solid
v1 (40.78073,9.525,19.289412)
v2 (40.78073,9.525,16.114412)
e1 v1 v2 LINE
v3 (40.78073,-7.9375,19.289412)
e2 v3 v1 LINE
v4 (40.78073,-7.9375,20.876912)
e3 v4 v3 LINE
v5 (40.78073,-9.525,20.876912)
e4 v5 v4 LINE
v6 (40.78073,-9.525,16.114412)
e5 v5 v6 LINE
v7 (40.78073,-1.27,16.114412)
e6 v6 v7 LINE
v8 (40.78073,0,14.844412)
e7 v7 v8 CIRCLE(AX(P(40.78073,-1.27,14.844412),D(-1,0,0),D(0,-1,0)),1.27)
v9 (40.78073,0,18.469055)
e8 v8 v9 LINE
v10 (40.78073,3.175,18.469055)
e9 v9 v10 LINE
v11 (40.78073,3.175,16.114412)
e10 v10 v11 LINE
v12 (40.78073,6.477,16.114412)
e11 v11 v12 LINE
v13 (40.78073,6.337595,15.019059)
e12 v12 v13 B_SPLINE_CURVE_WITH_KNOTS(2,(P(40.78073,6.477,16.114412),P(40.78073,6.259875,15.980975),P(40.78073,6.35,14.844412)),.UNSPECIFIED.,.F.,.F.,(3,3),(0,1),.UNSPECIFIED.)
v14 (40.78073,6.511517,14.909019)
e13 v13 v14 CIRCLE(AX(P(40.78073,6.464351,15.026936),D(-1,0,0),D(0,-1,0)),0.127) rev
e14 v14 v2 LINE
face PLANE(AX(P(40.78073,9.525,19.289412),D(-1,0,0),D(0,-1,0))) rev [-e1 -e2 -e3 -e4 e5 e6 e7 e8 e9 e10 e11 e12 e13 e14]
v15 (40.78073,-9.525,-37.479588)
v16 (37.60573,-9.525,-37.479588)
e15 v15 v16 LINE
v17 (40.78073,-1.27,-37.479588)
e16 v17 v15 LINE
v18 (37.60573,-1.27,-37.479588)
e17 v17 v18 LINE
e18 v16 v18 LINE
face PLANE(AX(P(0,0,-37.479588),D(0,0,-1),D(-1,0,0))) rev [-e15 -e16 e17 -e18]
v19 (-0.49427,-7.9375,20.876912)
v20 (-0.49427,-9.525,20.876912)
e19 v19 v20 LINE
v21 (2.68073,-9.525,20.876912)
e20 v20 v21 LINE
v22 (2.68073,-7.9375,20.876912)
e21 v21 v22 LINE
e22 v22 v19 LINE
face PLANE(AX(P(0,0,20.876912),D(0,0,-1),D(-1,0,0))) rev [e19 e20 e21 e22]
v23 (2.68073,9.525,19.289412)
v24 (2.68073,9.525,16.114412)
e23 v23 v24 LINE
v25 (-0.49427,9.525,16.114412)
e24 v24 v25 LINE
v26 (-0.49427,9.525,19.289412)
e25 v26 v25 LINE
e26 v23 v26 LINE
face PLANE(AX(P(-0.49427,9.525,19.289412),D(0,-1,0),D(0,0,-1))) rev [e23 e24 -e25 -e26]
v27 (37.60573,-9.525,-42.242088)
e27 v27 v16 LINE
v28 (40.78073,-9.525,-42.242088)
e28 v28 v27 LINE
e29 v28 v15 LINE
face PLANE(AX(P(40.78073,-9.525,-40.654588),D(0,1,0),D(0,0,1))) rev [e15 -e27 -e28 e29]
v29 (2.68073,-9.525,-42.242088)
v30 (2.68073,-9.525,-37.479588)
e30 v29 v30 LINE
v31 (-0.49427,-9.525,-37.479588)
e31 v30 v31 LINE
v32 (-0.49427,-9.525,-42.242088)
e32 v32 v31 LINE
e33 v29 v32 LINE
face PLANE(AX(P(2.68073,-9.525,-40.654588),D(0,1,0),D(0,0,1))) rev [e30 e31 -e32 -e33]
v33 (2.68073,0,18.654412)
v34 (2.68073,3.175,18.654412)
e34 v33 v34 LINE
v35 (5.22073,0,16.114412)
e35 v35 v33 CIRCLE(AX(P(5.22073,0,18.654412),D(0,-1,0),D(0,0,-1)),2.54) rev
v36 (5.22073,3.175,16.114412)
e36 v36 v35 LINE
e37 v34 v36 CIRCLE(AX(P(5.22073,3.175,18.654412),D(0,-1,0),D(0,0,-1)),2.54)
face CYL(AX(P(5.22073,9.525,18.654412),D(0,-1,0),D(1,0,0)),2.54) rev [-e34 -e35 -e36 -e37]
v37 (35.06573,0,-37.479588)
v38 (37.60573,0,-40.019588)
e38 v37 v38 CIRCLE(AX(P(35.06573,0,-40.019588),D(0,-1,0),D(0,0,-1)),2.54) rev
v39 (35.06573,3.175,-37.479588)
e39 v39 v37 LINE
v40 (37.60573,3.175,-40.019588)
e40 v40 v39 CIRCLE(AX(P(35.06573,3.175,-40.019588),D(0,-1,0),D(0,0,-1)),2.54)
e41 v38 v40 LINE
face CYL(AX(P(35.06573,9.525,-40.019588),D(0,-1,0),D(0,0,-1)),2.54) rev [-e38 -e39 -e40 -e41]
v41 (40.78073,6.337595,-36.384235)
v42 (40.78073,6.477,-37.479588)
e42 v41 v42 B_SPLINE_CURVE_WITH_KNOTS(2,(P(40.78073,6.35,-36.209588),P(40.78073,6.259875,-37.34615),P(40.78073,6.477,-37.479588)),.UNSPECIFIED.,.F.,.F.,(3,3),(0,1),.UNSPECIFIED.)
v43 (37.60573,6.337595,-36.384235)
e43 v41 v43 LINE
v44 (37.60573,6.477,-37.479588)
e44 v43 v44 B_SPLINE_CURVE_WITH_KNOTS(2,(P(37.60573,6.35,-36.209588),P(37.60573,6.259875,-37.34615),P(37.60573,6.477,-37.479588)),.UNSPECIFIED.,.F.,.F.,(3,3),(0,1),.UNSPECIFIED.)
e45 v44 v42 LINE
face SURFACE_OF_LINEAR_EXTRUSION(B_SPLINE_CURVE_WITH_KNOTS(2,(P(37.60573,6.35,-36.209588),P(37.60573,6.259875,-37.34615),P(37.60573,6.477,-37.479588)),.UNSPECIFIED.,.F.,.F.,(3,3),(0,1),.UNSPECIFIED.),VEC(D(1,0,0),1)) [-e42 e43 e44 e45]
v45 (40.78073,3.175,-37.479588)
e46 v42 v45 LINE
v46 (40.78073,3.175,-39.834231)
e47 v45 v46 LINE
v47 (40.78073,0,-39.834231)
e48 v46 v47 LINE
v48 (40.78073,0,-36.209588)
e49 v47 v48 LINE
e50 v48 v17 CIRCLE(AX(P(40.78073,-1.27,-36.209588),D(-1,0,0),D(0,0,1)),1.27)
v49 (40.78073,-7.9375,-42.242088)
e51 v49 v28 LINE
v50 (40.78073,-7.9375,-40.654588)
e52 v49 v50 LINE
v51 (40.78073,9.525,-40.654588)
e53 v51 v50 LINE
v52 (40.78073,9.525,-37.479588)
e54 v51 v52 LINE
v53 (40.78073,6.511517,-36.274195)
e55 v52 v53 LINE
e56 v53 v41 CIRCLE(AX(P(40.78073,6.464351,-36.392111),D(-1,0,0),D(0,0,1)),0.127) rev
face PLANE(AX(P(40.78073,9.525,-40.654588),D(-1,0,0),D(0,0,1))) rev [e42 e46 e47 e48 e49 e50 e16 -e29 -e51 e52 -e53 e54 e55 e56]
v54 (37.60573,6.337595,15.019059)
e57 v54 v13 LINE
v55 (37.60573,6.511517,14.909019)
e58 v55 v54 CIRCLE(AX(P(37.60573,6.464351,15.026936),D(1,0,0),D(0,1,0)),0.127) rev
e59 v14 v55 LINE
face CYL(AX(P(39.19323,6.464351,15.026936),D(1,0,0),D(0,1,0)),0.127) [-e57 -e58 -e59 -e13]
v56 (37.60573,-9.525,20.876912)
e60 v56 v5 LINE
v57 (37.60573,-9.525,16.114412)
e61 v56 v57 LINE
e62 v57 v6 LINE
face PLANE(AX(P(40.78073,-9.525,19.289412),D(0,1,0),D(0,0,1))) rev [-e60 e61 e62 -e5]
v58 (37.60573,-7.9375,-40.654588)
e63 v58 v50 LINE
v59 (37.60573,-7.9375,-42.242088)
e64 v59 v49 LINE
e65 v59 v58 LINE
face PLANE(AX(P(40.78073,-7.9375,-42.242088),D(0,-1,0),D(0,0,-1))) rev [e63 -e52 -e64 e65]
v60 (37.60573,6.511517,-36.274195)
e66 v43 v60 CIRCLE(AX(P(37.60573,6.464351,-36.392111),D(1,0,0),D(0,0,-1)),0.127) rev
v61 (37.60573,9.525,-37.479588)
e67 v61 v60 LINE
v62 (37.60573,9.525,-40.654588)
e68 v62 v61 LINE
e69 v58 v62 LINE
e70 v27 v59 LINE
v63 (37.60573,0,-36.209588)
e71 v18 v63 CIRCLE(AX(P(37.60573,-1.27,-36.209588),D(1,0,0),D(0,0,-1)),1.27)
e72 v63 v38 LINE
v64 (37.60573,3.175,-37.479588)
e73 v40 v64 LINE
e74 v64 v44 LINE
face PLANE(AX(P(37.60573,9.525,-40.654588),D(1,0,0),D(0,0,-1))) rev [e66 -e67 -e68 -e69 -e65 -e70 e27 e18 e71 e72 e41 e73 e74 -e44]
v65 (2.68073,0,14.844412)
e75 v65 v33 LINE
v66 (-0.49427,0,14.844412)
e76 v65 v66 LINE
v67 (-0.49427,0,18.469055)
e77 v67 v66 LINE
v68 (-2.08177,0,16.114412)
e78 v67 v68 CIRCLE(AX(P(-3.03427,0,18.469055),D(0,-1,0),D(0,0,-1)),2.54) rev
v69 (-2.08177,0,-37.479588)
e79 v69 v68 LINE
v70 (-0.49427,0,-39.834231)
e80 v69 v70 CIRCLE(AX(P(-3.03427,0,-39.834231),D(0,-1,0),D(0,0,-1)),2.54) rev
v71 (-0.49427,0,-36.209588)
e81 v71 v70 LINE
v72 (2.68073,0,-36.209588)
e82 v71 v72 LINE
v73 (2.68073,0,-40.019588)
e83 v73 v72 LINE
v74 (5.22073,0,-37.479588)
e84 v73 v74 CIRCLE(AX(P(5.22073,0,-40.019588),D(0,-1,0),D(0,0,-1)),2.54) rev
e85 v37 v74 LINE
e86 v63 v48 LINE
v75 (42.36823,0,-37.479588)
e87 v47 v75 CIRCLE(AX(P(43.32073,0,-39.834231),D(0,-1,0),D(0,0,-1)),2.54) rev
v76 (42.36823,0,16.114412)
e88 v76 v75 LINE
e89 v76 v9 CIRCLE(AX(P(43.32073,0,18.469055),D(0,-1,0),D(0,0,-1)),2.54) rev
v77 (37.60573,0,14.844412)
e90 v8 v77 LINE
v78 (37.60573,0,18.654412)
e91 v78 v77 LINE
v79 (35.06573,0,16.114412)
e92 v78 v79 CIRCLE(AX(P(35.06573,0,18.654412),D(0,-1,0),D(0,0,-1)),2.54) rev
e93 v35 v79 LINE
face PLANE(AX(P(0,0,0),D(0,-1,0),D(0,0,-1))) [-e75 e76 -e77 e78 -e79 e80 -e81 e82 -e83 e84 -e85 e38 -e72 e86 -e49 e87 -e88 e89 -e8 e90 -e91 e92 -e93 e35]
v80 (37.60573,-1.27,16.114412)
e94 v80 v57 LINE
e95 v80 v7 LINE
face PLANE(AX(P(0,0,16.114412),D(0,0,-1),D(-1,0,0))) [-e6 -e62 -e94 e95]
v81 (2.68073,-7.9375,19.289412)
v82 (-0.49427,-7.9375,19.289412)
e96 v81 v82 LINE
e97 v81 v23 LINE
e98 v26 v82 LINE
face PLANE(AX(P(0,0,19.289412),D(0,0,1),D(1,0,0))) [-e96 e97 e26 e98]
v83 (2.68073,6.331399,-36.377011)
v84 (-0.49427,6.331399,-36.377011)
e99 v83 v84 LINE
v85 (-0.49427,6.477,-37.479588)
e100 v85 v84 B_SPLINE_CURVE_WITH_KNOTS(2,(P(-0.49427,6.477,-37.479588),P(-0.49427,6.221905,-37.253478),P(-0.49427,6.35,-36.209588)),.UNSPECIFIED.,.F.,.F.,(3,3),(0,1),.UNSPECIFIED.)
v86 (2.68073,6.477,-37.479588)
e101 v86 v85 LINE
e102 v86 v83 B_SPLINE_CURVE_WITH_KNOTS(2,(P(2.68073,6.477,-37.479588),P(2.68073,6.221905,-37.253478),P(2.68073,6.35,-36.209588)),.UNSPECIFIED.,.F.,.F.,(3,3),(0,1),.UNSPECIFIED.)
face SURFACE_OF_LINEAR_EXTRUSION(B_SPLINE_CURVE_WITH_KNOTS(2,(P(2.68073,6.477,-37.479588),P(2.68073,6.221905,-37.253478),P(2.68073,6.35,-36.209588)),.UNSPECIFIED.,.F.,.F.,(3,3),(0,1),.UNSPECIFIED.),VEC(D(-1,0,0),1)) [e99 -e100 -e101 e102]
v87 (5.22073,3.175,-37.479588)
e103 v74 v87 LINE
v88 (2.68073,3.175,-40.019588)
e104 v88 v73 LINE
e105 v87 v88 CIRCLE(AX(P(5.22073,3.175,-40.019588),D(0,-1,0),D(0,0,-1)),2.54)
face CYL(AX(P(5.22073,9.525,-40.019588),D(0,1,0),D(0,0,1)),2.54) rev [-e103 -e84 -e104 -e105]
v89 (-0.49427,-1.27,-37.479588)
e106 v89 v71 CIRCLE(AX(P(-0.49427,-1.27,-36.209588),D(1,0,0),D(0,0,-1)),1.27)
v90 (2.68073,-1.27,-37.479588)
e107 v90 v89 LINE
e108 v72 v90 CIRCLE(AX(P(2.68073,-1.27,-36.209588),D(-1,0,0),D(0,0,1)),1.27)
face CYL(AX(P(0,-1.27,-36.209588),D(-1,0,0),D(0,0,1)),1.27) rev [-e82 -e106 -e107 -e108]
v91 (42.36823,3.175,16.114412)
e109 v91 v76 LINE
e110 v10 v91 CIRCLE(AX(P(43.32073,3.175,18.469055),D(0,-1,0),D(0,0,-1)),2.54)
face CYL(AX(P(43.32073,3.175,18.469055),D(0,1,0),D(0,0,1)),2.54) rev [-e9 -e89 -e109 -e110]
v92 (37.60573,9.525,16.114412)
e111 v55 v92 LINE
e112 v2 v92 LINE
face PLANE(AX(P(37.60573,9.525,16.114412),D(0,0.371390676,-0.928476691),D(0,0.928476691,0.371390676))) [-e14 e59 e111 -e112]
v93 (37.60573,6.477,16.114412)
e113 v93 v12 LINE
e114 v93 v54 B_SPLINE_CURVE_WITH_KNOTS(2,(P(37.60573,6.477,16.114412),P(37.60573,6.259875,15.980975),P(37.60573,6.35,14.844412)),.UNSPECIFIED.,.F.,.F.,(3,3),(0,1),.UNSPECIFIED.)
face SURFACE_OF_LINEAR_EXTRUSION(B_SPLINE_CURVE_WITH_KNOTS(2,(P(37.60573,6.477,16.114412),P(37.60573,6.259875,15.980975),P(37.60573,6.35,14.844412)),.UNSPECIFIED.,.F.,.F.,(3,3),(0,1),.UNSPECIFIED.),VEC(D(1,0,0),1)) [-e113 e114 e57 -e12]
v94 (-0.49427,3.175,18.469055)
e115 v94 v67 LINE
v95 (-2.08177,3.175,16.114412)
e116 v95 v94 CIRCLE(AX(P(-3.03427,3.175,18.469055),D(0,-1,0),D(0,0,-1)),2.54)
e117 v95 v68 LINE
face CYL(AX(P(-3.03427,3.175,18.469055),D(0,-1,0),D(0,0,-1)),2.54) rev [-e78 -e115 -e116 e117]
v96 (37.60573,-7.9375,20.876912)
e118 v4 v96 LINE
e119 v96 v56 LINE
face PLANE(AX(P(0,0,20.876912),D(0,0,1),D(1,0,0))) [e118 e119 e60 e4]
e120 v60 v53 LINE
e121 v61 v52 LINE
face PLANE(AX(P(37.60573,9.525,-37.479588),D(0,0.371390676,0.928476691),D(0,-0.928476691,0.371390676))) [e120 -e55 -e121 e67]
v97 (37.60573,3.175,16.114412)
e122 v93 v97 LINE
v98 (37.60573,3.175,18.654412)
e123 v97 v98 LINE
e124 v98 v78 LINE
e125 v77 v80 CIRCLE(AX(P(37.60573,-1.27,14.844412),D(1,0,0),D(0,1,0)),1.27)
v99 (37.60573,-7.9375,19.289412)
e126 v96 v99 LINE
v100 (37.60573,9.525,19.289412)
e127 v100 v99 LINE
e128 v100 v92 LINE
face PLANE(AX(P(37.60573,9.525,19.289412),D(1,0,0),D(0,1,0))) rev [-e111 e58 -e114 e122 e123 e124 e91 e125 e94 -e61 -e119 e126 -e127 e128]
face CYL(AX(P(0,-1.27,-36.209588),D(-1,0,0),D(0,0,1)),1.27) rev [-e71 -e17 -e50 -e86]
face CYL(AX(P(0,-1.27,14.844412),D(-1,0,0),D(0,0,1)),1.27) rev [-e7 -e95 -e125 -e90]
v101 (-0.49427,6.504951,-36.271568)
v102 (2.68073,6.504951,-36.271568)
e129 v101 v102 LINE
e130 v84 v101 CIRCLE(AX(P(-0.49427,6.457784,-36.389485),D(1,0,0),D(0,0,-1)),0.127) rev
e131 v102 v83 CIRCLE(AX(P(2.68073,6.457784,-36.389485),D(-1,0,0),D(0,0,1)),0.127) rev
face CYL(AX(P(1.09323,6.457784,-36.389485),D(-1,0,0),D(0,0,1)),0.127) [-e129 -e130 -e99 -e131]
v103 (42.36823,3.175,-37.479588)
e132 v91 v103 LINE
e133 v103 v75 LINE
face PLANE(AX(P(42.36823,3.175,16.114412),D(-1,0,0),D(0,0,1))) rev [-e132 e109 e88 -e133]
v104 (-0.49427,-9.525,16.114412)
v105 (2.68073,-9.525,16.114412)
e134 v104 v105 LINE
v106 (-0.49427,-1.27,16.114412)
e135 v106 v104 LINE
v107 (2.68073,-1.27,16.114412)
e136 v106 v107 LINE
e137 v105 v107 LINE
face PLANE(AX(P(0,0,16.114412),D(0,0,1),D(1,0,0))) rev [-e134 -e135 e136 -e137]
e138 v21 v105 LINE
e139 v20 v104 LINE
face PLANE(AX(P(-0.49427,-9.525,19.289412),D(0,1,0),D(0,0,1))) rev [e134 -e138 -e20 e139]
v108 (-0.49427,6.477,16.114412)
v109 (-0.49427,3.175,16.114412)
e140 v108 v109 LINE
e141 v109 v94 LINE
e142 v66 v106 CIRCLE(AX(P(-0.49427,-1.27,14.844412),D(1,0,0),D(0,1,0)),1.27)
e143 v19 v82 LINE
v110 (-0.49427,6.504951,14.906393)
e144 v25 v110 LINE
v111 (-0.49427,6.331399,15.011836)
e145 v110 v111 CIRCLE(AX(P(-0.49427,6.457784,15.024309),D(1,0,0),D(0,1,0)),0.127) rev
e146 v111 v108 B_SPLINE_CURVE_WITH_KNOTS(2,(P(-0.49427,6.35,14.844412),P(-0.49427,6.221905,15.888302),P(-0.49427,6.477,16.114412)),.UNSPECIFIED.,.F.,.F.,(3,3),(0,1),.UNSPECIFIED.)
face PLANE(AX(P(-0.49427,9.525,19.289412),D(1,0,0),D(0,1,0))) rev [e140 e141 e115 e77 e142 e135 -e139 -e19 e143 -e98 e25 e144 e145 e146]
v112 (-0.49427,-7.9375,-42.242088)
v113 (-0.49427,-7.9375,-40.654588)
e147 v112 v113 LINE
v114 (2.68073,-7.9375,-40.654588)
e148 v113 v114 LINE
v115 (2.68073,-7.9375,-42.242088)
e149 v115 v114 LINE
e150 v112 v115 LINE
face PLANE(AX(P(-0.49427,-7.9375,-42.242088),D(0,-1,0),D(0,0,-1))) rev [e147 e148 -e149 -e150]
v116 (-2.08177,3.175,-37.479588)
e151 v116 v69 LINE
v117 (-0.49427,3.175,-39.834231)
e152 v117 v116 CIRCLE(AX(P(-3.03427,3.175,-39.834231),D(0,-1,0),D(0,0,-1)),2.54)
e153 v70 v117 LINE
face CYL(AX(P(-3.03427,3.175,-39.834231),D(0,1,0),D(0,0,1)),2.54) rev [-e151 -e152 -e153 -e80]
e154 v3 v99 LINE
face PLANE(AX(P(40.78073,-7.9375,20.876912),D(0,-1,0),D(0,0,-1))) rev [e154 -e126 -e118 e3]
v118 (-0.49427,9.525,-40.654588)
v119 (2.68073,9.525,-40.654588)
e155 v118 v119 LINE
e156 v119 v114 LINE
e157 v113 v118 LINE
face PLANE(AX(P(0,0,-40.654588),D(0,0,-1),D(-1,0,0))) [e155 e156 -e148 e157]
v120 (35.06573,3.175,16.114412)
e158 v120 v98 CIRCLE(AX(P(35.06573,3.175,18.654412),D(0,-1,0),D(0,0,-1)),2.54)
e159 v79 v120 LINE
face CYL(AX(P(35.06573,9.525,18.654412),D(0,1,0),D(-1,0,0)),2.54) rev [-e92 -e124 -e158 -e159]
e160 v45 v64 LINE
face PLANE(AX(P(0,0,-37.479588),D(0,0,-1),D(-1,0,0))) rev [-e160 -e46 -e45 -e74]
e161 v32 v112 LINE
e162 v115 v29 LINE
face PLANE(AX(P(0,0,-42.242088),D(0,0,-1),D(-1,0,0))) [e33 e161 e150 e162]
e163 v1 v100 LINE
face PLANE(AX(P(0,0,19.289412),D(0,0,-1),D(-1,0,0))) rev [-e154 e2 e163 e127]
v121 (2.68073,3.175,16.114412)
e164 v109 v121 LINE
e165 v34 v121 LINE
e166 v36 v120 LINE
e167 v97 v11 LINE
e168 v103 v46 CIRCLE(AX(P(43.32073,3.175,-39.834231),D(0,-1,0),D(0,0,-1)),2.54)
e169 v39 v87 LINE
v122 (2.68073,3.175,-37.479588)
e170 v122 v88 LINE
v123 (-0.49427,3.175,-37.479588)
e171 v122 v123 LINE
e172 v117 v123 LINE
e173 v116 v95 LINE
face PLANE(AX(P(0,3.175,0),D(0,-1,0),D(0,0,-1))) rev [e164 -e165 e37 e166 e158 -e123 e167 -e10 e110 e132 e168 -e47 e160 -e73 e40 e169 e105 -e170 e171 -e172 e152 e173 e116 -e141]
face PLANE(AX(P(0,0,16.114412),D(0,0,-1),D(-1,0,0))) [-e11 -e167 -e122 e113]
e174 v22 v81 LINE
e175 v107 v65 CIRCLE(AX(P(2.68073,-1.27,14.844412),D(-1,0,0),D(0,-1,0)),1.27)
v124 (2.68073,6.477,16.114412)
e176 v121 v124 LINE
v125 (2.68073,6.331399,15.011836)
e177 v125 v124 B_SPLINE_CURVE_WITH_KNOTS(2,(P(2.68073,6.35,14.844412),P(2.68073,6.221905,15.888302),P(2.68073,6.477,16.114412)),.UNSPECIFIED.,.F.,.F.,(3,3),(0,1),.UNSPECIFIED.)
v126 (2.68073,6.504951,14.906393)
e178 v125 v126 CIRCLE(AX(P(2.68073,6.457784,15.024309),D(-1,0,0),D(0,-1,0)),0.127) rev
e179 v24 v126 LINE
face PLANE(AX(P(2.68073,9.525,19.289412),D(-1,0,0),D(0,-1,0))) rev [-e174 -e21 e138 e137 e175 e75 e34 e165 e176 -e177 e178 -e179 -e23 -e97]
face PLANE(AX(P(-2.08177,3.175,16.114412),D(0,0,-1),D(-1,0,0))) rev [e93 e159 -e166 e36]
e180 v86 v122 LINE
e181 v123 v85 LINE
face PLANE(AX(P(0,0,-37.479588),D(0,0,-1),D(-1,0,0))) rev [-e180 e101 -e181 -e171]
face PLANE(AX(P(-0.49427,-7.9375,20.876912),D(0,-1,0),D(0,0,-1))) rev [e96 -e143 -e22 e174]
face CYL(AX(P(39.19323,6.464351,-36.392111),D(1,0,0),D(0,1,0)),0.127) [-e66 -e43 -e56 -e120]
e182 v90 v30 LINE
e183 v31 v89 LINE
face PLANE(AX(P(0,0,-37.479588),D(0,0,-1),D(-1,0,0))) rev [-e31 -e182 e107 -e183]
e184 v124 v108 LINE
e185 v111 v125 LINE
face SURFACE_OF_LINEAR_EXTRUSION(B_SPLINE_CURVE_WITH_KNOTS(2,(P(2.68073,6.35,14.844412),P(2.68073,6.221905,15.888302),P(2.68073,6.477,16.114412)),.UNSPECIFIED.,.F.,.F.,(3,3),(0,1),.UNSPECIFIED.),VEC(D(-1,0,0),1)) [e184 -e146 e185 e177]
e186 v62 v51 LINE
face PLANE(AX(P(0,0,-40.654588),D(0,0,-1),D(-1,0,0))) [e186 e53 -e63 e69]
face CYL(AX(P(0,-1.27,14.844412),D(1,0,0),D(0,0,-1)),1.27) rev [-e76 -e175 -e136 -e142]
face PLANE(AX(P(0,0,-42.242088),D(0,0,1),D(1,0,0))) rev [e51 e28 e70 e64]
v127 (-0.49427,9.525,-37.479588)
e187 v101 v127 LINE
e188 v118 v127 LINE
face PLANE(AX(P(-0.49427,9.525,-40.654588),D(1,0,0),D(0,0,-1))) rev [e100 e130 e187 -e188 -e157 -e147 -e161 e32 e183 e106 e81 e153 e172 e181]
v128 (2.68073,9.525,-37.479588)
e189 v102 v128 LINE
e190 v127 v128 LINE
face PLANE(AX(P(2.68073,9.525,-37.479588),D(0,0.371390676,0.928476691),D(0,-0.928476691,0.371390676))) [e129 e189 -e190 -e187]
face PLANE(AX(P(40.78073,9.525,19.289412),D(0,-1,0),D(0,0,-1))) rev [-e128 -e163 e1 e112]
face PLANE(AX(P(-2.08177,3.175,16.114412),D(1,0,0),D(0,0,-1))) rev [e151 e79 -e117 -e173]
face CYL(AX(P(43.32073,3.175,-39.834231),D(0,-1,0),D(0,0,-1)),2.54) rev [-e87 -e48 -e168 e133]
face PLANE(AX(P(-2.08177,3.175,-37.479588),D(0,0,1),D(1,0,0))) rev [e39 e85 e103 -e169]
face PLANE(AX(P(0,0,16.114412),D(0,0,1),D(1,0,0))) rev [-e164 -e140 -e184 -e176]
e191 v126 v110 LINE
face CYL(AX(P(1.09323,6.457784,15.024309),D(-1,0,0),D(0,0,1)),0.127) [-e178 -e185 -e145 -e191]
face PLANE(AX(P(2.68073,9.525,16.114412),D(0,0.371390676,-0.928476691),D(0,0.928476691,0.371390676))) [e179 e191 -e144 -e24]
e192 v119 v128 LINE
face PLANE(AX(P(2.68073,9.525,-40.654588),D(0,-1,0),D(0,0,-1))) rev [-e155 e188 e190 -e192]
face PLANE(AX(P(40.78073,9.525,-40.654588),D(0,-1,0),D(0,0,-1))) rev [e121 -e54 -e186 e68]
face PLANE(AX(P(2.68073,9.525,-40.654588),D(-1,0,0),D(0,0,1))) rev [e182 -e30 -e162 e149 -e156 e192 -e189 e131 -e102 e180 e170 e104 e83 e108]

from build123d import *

# Parameters (mm, degrees)
SKETCH1_W           = 44.45
SKETCH1_H           = 53.594
BOSS_EXTRUDE1_DEPTH = 3.175
SKETCH2_W           = 3.175
SKETCH2_H           = 19.05
BOSS_EXTRUDE2_DEPTH = 3.175
SKETCH4_W           = 3.175
SKETCH4_H           = 19.05
BOSS_EXTRUDE3_DEPTH = 3.175
BOSS_EXTRUDE4_DEPTH = 3.175
BOSS_EXTRUDE5_DEPTH = 3.175
SKETCH11_W          = 3.175
SKETCH11_H          = 1.5875
BOSS_EXTRUDE6_DEPTH = 1.5875
SKETCH12_W          = 3.175
SKETCH12_H          = 1.5875
BOSS_EXTRUDE7_DEPTH = 1.5875
FILLET1_R           = 2.54
FILLET2_R           = 0.127
FILLET3_R           = 1.27


with BuildPart() as part:
    # Sketch1 → Boss-Extrude1 (new body)
    with BuildSketch(Plane(origin=(0, 0, 0), x_dir=(1, 0, 0), z_dir=(0, 1, 0))):
        with Locations((20.14322973, 10.682587838)):
            Rectangle(SKETCH1_W, SKETCH1_H)
    extrude(amount=BOSS_EXTRUDE1_DEPTH)

    # Sketch2 → Boss-Extrude2 (add)
    with BuildSketch(Plane.XY.offset(16.114412162)):
        with Locations((1.09322973, 0)):
            Rectangle(SKETCH2_W, SKETCH2_H)
        with Locations((39.19322973, 0)):
            Rectangle(SKETCH2_W, SKETCH2_H)
    extrude(amount=BOSS_EXTRUDE2_DEPTH)

    # Sketch4 → Boss-Extrude3 (add)
    with BuildSketch(Plane(origin=(0, 0, -37.479587838), x_dir=(-1, 0, 0), z_dir=(0, 0, -1))):
        with Locations((-1.09322973, 0)):
            Rectangle(SKETCH4_W, SKETCH4_H)
        with Locations((-39.19322973, 0)):
            Rectangle(SKETCH4_W, SKETCH4_H)
    extrude(amount=BOSS_EXTRUDE3_DEPTH)

    # Sketch9 → Boss-Extrude4 (add)
    with BuildSketch(Plane(origin=(40.78072973, 0, 0), x_dir=(0, 0, -1), z_dir=(1, 0, 0))):
        with BuildLine():
            Line((-16.114412162, 9.525), (-14.844412162, 6.35))
            add(Edge.make_bspline(
                [(-14.844412162, 6.35), (-15.980974803, 6.259875381), (-16.114412162, 6.477)],
                knots=[0, 0, 0, 1, 1, 1], degree=2))
            Line((-16.114412162, 6.477), (-16.114412162, 9.525))
        make_face()
        with BuildLine():
            Line((37.479587838, 9.525), (36.209587838, 6.35))
            add(Edge.make_bspline(
                [(36.209587838, 6.35), (37.346150478, 6.259875381), (37.479587838, 6.477)],
                knots=[0, 0, 0, 1, 1, 1], degree=2))
            Line((37.479587838, 6.477), (37.479587838, 9.525))
        make_face()
    extrude(amount=-BOSS_EXTRUDE4_DEPTH)

    # Sketch10 → Boss-Extrude5 (add)
    with BuildSketch(Plane.ZY.offset(0.49427027)):
        with BuildLine():
            Line((-37.479587838, 9.525), (-36.209587838, 6.35))
            add(Edge.make_bspline(
                [(-36.209587838, 6.35), (-37.253478126, 6.221904512), (-37.479587838, 6.477)],
                knots=[0, 0, 0, 1, 1, 1], degree=2))
            Line((-37.479587838, 6.477), (-37.479587838, 9.525))
        make_face()
        with BuildLine():
            Line((16.114412162, 9.525), (14.844412162, 6.35))
            add(Edge.make_bspline(
                [(14.844412162, 6.35), (15.88830245, 6.221904512), (16.114412162, 6.477)],
                knots=[0, 0, 0, 1, 1, 1], degree=2))
            Line((16.114412162, 6.477), (16.114412162, 9.525))
        make_face()
    extrude(amount=-BOSS_EXTRUDE5_DEPTH)

    # Sketch11 → Boss-Extrude6 (add)
    with BuildSketch(Plane.XY.offset(19.289412162)):
        with Locations((1.09322973, -8.73125)):
            Rectangle(SKETCH11_W, SKETCH11_H)
        with Locations((39.19322973, -8.73125)):
            Rectangle(SKETCH11_W, SKETCH11_H)
    extrude(amount=BOSS_EXTRUDE6_DEPTH)

    # Sketch12 → Boss-Extrude7 (add)
    with BuildSketch(Plane(origin=(0, 0, -40.654587838), x_dir=(-1, 0, 0), z_dir=(0, 0, -1))):
        with Locations((-39.19322973, -8.73125)):
            Rectangle(SKETCH12_W, SKETCH12_H)
        with Locations((-1.09322973, -8.73125)):
            Rectangle(SKETCH12_W, SKETCH12_H)
    extrude(amount=BOSS_EXTRUDE7_DEPTH)

    # Fillet1
    # the kernel refuses this fillet: 2.54 mm, written as the material it adds along each edge
    with BuildSketch(Plane(origin=(37.60572973, 0, 16.114412162), x_dir=(0, 0, 1), z_dir=(0, 1, 0)), Plane(origin=(2.68072973, 0, -37.479587838), x_dir=(0, 0, -1), z_dir=(0, 1, 0))) as fillet1_piece_1:
        with BuildLine():
            CenterArc((FILLET1_R, -FILLET1_R), FILLET1_R, 90, 90)
            Line((0, -FILLET1_R), (0, 0))
            Line((0, 0), (FILLET1_R, 0))
        make_face()
    extrude(amount=3.175)
    with BuildSketch(Plane(origin=(40.78072973, 3.175, 16.114412162), x_dir=(1, 0, 0), z_dir=(0, -1, 0)), Plane(origin=(-0.49427027, 0, 16.114412162), x_dir=(-1, 0, 0), z_dir=(0, 1, 0)), Plane(origin=(-0.49427027, 3.175, -37.479587838), x_dir=(-1, 0, 0), z_dir=(0, -1, 0))) as fillet1_piece_2:
        with BuildLine():
            CenterArc((2.54, 2.35464302), FILLET1_R, 180, 67.975687163)
            Line((0, 2.35464302), (0, 0))
            Line((0, 0), (1.5875, 0))
        make_face()
    extrude(amount=3.175)
    with BuildSketch(Plane(origin=(2.68072973, 3.175, 16.114412162), x_dir=(1, 0, 0), z_dir=(0, -1, 0)), Plane(origin=(37.60572973, 3.175, -37.479587838), x_dir=(-1, 0, 0), z_dir=(0, -1, 0))) as fillet1_piece_3:
        with BuildLine():
            CenterArc((FILLET1_R, FILLET1_R), FILLET1_R, 180, 90)
            Line((0, FILLET1_R), (0, 0))
            Line((0, 0), (FILLET1_R, 0))
        make_face()
    extrude(amount=3.175)
    with BuildSketch(Plane(origin=(40.78072973, 0, -37.479587838), x_dir=(0, 0, -1), z_dir=(0, 1, 0))) as fillet1_piece_4:
        with BuildLine():
            CenterArc((2.35464302, -2.54), FILLET1_R, 90, 67.975687163)
            Line((0, -1.5875), (0, 0))
            Line((0, 0), (2.35464302, 0))
        make_face()
    extrude(amount=3.175)

    # Fillet2
    fillet2_edges = [part.edges().sort_by_distance(p)[0] for p in [
        (39.19322973, 6.35, 14.844412162),
        (39.19322973, 6.35, -36.209587838),
        (1.09322973, 6.35, -36.209587838),
        (1.09322973, 6.35, 14.844412162),
    ]]
    fillet(fillet2_edges, radius=FILLET2_R)

    # Fillet3
    fillet3_edges = [part.edges().sort_by_distance(p)[0] for p in [
        (1.09322973, 0, 16.114412162),
        (39.19322973, 0, 16.114412162),
        (39.19322973, 0, -37.479587838),
        (1.09322973, 0, -37.479587838),
    ]]
    fillet(fillet3_edges, radius=FILLET3_R)


solid = part.part
